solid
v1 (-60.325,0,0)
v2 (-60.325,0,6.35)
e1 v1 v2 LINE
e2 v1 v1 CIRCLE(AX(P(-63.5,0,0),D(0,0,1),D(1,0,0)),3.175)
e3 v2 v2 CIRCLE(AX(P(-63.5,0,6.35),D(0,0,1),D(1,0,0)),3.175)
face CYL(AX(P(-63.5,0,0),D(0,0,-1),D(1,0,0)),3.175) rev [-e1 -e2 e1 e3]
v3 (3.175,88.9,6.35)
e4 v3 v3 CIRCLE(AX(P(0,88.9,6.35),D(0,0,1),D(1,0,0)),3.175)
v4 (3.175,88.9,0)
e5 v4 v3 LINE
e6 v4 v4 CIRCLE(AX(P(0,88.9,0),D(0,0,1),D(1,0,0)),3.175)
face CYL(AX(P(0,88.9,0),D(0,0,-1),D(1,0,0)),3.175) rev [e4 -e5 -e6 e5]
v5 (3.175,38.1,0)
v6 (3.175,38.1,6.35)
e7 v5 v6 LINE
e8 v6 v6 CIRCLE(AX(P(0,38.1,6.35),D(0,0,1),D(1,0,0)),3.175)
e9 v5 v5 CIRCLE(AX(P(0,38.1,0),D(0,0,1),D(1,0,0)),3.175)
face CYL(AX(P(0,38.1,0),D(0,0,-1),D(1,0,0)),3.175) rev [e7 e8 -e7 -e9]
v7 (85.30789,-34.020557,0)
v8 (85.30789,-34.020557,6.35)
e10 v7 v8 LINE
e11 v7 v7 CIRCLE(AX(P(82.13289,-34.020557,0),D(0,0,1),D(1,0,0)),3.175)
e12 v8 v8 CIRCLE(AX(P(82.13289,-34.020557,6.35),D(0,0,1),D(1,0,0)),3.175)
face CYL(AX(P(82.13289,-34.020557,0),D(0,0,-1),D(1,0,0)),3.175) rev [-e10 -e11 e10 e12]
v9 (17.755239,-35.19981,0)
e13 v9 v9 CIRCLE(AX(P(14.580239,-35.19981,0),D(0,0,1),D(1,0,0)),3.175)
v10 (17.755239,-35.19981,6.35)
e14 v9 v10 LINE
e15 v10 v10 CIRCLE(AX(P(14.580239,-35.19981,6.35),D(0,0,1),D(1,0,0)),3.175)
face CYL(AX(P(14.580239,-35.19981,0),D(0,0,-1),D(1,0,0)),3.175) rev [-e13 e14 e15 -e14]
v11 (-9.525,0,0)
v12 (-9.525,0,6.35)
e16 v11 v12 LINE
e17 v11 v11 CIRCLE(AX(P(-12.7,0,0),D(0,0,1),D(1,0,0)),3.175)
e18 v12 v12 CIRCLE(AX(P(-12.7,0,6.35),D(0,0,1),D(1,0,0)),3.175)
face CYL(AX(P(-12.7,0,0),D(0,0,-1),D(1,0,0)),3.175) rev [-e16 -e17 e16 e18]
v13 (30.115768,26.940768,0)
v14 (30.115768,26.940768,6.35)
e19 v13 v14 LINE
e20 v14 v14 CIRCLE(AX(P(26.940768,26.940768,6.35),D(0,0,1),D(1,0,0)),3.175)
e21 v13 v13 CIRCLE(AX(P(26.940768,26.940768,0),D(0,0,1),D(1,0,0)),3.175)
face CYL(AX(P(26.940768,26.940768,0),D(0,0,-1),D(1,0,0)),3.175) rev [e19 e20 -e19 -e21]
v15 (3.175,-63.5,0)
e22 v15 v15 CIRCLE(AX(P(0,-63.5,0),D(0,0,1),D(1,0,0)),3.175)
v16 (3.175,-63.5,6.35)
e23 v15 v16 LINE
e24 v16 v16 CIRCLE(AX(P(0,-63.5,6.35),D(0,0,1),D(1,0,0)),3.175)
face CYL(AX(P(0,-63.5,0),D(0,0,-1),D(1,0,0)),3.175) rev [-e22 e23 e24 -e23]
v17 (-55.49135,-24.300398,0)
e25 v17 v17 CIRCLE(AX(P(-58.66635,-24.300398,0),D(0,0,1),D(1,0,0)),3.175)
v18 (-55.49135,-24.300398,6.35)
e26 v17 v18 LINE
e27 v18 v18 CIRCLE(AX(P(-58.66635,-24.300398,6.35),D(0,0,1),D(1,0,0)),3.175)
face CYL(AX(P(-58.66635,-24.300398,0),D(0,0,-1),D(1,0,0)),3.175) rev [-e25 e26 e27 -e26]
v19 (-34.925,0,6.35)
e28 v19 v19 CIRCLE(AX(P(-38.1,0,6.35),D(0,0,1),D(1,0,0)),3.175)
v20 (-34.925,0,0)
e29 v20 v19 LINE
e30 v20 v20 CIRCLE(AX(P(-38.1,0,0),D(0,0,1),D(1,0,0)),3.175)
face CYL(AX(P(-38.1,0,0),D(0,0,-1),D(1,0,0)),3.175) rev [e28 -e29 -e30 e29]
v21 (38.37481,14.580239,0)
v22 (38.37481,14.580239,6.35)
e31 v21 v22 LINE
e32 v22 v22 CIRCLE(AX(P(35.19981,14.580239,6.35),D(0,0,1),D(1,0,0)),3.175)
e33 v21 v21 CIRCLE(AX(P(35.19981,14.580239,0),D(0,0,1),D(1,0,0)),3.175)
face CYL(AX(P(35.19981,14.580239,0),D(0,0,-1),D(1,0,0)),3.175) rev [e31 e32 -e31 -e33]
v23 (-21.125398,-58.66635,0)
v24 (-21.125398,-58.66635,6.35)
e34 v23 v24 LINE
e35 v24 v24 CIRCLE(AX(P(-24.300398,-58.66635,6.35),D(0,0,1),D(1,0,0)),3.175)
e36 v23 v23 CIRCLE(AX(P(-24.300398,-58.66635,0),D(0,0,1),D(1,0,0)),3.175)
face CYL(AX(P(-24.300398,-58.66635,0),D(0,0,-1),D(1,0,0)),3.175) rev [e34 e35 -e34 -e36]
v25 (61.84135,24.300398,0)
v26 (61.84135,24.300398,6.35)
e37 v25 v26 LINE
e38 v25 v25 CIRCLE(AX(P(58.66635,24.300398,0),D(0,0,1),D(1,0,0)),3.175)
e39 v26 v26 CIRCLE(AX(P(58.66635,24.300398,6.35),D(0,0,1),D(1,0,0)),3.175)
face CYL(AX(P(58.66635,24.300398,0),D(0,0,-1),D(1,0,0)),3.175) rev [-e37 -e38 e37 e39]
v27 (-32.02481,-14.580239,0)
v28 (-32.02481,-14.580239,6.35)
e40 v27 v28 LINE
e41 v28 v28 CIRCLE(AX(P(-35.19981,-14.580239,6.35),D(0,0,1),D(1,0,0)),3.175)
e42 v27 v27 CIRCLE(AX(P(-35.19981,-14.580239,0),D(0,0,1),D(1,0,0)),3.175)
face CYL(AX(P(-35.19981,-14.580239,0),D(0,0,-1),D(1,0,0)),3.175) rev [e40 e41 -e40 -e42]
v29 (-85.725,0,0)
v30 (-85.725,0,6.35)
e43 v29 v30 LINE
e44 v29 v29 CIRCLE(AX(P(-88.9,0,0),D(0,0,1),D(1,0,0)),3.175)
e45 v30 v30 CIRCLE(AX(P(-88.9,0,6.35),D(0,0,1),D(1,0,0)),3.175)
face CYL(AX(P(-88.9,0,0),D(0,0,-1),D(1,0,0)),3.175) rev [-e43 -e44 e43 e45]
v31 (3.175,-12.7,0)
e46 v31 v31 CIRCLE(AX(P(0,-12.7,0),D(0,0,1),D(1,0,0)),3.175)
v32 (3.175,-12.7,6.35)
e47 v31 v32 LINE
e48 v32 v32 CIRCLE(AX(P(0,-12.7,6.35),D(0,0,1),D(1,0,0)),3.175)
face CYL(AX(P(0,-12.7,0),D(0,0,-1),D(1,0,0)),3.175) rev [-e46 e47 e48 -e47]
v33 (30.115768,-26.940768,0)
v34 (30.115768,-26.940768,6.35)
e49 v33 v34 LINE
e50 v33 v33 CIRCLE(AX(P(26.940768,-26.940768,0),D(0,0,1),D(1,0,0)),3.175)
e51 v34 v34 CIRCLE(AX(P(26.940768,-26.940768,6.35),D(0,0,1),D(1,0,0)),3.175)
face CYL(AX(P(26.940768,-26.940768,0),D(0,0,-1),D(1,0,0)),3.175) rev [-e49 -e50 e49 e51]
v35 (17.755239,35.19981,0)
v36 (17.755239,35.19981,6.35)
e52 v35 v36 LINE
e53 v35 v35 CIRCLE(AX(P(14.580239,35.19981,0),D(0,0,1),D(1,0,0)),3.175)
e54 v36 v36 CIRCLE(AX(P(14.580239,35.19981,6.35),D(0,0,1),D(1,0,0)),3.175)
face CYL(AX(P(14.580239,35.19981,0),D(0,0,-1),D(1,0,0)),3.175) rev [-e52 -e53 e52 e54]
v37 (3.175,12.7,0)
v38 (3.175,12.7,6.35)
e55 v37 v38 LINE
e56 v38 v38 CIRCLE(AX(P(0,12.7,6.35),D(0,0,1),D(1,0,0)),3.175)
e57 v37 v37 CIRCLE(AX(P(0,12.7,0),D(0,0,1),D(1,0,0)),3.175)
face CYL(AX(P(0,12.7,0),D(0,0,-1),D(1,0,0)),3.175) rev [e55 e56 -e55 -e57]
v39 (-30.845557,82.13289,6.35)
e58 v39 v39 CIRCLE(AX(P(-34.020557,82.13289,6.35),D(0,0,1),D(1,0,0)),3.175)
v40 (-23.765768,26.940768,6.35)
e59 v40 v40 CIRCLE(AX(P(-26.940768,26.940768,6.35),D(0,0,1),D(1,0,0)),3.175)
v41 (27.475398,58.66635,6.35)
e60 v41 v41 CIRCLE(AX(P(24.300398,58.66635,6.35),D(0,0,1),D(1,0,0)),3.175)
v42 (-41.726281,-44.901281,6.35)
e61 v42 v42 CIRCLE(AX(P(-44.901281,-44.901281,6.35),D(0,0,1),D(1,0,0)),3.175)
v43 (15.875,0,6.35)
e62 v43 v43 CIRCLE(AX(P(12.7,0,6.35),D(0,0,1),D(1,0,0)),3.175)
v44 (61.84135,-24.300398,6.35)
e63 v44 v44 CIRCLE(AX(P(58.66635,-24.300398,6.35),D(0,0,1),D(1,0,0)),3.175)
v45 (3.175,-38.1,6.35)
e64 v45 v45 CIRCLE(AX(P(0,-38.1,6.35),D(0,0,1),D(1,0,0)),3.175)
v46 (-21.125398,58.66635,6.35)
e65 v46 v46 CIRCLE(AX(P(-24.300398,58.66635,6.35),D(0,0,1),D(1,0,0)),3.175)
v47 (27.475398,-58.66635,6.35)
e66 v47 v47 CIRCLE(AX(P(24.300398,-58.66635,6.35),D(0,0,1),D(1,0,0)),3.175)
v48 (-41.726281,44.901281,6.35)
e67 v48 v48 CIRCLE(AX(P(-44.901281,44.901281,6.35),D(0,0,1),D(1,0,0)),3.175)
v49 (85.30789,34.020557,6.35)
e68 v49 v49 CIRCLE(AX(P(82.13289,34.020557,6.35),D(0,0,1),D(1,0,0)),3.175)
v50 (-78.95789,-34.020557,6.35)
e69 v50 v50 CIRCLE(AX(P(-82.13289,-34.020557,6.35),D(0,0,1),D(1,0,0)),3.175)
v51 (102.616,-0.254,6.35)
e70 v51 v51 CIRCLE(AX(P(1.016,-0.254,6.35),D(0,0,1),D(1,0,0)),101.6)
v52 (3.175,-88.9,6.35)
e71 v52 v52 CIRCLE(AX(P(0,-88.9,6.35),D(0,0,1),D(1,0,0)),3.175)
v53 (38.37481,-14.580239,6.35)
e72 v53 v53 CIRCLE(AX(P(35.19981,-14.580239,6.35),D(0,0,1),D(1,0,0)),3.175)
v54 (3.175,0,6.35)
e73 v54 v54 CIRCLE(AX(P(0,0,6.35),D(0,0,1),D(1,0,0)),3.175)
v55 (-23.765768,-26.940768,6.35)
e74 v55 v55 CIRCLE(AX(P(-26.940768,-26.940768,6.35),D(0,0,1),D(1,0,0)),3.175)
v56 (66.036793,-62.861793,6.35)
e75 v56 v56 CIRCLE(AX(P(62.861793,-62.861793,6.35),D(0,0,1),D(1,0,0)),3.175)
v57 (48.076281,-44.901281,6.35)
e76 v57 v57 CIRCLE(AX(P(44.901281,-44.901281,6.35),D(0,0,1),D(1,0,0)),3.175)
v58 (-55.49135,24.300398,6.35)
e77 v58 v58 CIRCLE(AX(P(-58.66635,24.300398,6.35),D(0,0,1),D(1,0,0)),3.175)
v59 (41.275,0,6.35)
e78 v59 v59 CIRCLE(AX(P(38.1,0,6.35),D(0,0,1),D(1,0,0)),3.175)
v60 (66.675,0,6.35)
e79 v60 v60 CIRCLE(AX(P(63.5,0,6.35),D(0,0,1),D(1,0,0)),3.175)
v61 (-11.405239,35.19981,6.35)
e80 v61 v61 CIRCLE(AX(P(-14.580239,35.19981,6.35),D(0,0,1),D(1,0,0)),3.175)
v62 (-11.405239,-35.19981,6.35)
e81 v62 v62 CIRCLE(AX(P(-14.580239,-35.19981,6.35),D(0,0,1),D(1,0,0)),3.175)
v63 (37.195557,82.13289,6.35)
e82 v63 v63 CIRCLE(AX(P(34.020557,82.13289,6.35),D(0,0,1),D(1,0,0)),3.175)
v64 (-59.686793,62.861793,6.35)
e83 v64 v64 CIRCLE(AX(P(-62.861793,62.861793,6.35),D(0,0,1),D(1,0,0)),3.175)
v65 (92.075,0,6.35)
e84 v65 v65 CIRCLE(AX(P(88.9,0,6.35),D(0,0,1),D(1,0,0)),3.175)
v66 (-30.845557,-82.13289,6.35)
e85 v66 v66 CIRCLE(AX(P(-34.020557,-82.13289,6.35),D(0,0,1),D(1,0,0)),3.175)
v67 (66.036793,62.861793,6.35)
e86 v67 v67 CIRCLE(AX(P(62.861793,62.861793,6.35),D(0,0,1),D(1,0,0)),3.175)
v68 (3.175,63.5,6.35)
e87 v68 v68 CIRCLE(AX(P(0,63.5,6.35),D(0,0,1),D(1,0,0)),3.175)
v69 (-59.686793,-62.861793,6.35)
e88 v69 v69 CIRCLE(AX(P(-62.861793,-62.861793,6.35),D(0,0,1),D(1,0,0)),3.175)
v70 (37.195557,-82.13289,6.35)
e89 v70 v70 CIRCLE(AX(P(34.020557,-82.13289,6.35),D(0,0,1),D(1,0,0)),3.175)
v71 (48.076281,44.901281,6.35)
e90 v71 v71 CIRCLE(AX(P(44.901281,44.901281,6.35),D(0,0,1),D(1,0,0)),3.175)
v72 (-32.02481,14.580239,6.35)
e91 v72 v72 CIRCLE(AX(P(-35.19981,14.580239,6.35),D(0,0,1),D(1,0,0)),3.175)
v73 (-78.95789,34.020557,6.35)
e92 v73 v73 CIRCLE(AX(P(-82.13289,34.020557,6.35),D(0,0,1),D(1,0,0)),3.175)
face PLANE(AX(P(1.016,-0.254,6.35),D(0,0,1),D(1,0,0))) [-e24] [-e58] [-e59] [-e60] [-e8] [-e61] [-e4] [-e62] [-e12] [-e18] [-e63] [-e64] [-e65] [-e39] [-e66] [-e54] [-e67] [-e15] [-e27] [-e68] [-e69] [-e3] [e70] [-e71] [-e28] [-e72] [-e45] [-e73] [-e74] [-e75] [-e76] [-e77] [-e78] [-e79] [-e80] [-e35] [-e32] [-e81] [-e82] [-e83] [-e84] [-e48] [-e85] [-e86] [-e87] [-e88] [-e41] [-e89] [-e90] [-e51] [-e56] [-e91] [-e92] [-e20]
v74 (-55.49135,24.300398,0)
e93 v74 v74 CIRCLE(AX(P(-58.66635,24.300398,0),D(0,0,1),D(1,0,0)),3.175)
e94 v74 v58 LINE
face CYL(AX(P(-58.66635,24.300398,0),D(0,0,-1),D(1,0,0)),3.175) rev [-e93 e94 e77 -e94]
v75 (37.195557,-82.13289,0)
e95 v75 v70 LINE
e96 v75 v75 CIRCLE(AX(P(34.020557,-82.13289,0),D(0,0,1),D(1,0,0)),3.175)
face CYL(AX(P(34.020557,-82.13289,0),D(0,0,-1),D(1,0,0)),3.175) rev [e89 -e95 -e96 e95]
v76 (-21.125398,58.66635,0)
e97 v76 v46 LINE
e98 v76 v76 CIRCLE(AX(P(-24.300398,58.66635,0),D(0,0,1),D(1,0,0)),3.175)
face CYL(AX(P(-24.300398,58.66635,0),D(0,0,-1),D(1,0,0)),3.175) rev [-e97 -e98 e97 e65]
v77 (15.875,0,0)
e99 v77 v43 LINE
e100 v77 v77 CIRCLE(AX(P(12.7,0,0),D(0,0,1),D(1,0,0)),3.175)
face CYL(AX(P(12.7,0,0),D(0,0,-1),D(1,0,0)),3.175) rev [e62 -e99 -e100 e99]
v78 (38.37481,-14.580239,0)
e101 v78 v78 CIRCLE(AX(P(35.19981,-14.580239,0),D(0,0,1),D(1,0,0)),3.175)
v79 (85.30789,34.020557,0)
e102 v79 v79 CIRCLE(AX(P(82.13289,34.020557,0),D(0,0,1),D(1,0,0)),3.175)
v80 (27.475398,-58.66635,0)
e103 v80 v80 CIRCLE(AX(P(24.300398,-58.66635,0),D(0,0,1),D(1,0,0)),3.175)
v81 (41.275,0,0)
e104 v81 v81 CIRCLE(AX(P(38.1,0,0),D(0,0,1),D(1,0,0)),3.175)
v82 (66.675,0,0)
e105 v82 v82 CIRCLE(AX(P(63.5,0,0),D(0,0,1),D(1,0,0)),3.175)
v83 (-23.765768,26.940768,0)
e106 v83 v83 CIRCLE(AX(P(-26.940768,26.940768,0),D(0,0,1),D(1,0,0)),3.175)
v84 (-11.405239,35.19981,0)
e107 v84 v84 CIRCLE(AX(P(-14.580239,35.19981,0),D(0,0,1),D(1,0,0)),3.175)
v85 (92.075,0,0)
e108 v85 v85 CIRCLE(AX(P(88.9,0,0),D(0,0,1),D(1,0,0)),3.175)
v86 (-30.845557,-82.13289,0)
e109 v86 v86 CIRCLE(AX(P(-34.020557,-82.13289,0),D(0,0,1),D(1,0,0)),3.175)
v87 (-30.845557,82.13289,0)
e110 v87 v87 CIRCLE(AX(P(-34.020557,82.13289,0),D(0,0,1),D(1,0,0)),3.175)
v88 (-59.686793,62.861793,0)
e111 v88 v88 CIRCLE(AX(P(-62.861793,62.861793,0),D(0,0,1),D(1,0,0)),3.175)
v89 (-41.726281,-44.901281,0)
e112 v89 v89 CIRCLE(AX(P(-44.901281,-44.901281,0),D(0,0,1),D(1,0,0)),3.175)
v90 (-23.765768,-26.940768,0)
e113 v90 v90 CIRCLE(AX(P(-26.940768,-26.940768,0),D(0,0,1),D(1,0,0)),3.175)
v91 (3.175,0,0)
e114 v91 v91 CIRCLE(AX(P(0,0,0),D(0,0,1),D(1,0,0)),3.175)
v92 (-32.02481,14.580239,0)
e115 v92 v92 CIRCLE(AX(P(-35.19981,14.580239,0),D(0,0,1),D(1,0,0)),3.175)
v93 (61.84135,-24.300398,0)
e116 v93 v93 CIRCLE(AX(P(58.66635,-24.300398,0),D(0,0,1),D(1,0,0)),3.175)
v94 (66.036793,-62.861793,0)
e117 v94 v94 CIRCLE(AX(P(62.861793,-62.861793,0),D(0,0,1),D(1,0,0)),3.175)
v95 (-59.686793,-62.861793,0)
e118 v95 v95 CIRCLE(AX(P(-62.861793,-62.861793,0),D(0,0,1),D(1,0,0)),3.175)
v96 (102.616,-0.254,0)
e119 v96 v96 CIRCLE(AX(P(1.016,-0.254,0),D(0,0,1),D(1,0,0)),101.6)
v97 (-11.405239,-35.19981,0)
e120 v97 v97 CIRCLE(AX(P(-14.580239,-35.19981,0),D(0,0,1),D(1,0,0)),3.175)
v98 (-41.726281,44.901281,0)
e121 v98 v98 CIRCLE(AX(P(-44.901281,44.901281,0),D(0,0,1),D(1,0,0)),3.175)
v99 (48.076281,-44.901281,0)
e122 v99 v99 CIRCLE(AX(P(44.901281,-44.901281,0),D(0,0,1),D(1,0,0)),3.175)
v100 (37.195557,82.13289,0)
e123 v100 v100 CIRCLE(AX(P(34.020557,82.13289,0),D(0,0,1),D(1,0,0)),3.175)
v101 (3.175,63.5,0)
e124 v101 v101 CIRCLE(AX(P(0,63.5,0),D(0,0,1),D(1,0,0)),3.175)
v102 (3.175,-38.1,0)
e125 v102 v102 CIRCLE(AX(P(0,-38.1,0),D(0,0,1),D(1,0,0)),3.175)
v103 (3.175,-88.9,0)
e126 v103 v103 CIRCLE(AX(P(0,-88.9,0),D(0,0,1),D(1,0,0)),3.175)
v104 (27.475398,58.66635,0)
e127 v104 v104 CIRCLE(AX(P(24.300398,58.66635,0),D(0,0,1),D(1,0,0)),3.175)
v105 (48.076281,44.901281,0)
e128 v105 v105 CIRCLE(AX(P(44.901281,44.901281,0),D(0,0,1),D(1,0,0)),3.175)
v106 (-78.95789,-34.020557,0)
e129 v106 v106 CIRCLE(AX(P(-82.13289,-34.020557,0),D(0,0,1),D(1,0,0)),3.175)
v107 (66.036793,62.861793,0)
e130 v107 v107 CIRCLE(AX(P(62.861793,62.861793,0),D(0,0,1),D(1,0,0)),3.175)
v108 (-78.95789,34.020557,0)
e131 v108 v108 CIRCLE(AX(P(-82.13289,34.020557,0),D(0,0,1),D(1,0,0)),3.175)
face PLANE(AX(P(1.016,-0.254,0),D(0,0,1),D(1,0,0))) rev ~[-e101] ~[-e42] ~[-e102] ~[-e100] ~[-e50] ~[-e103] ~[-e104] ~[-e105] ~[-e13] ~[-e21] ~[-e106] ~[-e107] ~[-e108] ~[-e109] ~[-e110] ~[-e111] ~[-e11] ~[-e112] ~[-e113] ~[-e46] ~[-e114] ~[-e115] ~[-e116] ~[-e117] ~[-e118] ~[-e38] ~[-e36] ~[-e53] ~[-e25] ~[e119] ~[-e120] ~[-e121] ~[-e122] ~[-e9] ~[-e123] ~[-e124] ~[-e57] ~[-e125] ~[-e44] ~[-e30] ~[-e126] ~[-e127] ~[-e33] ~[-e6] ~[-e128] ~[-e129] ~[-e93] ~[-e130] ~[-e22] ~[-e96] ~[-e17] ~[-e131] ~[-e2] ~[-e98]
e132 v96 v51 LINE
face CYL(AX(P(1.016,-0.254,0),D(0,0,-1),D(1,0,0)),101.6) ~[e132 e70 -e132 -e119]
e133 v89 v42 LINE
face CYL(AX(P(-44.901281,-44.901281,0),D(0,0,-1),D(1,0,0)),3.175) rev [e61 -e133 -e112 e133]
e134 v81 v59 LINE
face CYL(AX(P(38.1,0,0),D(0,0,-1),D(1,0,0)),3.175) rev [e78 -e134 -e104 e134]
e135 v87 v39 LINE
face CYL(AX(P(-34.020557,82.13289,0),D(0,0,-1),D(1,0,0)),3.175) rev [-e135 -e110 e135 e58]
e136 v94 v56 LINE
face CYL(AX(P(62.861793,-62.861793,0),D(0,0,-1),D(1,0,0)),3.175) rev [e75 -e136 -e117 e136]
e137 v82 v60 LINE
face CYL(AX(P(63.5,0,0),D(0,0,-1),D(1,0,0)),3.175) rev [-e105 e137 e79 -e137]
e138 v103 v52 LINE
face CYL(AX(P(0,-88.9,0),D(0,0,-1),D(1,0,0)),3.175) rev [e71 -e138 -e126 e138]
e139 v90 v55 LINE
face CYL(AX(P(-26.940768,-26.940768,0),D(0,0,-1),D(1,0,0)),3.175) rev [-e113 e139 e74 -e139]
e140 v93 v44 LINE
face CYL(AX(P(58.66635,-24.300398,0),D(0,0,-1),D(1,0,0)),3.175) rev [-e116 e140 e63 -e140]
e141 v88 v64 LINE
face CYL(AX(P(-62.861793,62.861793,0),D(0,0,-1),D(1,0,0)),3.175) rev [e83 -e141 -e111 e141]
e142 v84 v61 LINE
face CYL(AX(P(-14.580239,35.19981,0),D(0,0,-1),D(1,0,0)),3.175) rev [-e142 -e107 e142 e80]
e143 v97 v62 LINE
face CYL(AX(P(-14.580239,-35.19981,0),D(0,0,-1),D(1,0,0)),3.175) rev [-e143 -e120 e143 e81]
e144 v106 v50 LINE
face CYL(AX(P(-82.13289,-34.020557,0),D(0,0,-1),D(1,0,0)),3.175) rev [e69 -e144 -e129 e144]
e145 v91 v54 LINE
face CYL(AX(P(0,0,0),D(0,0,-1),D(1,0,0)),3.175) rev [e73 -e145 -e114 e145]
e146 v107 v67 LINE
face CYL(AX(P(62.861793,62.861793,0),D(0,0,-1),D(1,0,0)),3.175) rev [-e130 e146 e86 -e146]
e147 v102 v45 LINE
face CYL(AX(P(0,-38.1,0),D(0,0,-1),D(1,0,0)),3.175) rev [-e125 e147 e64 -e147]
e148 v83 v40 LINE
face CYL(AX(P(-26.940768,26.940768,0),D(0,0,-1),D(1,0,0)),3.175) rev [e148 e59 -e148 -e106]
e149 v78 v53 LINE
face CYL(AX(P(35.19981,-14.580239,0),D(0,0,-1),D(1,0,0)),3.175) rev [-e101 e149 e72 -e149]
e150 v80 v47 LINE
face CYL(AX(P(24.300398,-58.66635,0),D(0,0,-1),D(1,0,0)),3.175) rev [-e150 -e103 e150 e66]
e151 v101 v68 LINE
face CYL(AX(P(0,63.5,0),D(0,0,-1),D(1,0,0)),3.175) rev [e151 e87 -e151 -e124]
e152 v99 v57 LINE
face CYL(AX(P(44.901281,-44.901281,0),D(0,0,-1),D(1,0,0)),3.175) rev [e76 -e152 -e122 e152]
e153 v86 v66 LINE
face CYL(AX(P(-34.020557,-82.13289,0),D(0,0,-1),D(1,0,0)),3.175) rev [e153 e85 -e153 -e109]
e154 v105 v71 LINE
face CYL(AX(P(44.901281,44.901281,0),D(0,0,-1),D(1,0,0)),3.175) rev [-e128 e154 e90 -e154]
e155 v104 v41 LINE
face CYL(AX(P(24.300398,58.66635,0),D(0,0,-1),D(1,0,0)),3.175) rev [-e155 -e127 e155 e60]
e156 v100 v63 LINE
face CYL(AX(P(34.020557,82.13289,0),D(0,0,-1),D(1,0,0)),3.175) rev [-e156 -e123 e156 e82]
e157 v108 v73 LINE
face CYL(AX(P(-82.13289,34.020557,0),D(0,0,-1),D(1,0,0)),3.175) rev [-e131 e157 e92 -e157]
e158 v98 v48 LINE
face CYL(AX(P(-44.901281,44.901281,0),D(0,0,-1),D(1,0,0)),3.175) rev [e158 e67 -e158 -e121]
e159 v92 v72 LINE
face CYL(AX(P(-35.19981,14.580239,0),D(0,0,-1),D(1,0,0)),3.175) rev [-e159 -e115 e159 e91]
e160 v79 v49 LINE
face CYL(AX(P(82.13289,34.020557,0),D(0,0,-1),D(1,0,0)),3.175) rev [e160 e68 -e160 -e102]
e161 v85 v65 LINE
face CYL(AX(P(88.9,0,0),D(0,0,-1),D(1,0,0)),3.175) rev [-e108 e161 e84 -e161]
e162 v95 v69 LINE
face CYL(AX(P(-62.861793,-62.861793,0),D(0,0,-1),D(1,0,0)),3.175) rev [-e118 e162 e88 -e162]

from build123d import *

# Parameters (mm, degrees)
F0_R     = 101.6
F0_R_2   = 3.175
F1_DEPTH = 6.35


# Not quite as in the source:
# - the program builds the solid bodies; features that only make, move or delete a surface that nothing else refers to are left out


with BuildPart() as f1:
    # F0 (on Top) → F1 (new body)
    with BuildSketch(Plane.XY):
        with Locations((1.0160004022, -0.2540000132)):
            Circle(F0_R)
        with Locations((-62.8617928475, -62.8617928475)):
            Circle(F0_R_2, mode=Mode.SUBTRACT)
        with Locations((-34.0205571373, -82.1328904403)):
            Circle(F0_R_2, mode=Mode.SUBTRACT)
        with Locations((0, -88.9)):
            Circle(F0_R_2, mode=Mode.SUBTRACT)
        with Locations((-24.3003979552, -58.6663503145)):
            Circle(F0_R_2, mode=Mode.SUBTRACT)
        with Locations((0, -63.5)):
            Circle(F0_R_2, mode=Mode.SUBTRACT)
        with Locations((-82.1328904403, -34.0205571373)):
            Circle(F0_R_2, mode=Mode.SUBTRACT)
        with Locations((-58.6663503145, -24.3003979552)):
            Circle(F0_R_2, mode=Mode.SUBTRACT)
        with Locations((-44.9012806053, -44.9012806053)):
            Circle(F0_R_2, mode=Mode.SUBTRACT)
        with Locations((-26.9407683632, -26.9407683632)):
            Circle(F0_R_2, mode=Mode.SUBTRACT)
        with Locations((-14.5802387731, -35.1998101887)):
            Circle(F0_R_2, mode=Mode.SUBTRACT)
        with Locations((0, -38.1)):
            Circle(F0_R_2, mode=Mode.SUBTRACT)
        with Locations((-35.1998101887, -14.5802387731)):
            Circle(F0_R_2, mode=Mode.SUBTRACT)
        with Locations((0, -12.7)):
            Circle(F0_R_2, mode=Mode.SUBTRACT)
        with Locations((34.0205571373, -82.1328904403)):
            Circle(F0_R_2, mode=Mode.SUBTRACT)
        with Locations((24.3003979552, -58.6663503145)):
            Circle(F0_R_2, mode=Mode.SUBTRACT)
        with Locations((62.8617928475, -62.8617928475)):
            Circle(F0_R_2, mode=Mode.SUBTRACT)
        with Locations((14.5802387731, -35.1998101887)):
            Circle(F0_R_2, mode=Mode.SUBTRACT)
        with Locations((44.9012806053, -44.9012806053)):
            Circle(F0_R_2, mode=Mode.SUBTRACT)
        with Locations((26.9407683632, -26.9407683632)):
            Circle(F0_R_2, mode=Mode.SUBTRACT)
        with Locations((35.1998101887, -14.5802387731)):
            Circle(F0_R_2, mode=Mode.SUBTRACT)
        with Locations((82.1328904403, -34.0205571373)):
            Circle(F0_R_2, mode=Mode.SUBTRACT)
        with Locations((58.6663503145, -24.3003979552)):
            Circle(F0_R_2, mode=Mode.SUBTRACT)
        with Locations((-88.9, 0)):
            Circle(F0_R_2, mode=Mode.SUBTRACT)
        with Locations((-63.5, 0)):
            Circle(F0_R_2, mode=Mode.SUBTRACT)
        with Locations((-58.6663503145, 24.3003979552)):
            Circle(F0_R_2, mode=Mode.SUBTRACT)
        with Locations((-82.1328904403, 34.0205571373)):
            Circle(F0_R_2, mode=Mode.SUBTRACT)
        with Locations((-38.1, 0)):
            Circle(F0_R_2, mode=Mode.SUBTRACT)
        with Locations((-35.1998101887, 14.5802387731)):
            Circle(F0_R_2, mode=Mode.SUBTRACT)
        with Locations((-12.7, 0)):
            Circle(F0_R_2, mode=Mode.SUBTRACT)
        Circle(F0_R_2, mode=Mode.SUBTRACT)
        with Locations((0, 12.7)):
            Circle(F0_R_2, mode=Mode.SUBTRACT)
        with Locations((-26.9407683632, 26.9407683632)):
            Circle(F0_R_2, mode=Mode.SUBTRACT)
        with Locations((-44.9012806053, 44.9012806053)):
            Circle(F0_R_2, mode=Mode.SUBTRACT)
        with Locations((-14.5802387731, 35.1998101887)):
            Circle(F0_R_2, mode=Mode.SUBTRACT)
        with Locations((0, 38.1)):
            Circle(F0_R_2, mode=Mode.SUBTRACT)
        with Locations((-62.8617928475, 62.8617928475)):
            Circle(F0_R_2, mode=Mode.SUBTRACT)
        with Locations((-24.3003979552, 58.6663503145)):
            Circle(F0_R_2, mode=Mode.SUBTRACT)
        with Locations((0, 63.5)):
            Circle(F0_R_2, mode=Mode.SUBTRACT)
        with Locations((-34.0205571373, 82.1328904403)):
            Circle(F0_R_2, mode=Mode.SUBTRACT)
        with Locations((0, 88.9)):
            Circle(F0_R_2, mode=Mode.SUBTRACT)
        with Locations((12.7, 0)):
            Circle(F0_R_2, mode=Mode.SUBTRACT)
        with Locations((38.1, 0)):
            Circle(F0_R_2, mode=Mode.SUBTRACT)
        with Locations((35.1998101887, 14.5802387731)):
            Circle(F0_R_2, mode=Mode.SUBTRACT)
        with Locations((14.5802387731, 35.1998101887)):
            Circle(F0_R_2, mode=Mode.SUBTRACT)
        with Locations((26.9407683632, 26.9407683632)):
            Circle(F0_R_2, mode=Mode.SUBTRACT)
        with Locations((44.9012806053, 44.9012806053)):
            Circle(F0_R_2, mode=Mode.SUBTRACT)
        with Locations((63.5, 0)):
            Circle(F0_R_2, mode=Mode.SUBTRACT)
        with Locations((58.6663503145, 24.3003979552)):
            Circle(F0_R_2, mode=Mode.SUBTRACT)
        with Locations((88.9, 0)):
            Circle(F0_R_2, mode=Mode.SUBTRACT)
        with Locations((82.1328904403, 34.0205571373)):
            Circle(F0_R_2, mode=Mode.SUBTRACT)
        with Locations((24.3003979552, 58.6663503145)):
            Circle(F0_R_2, mode=Mode.SUBTRACT)
        with Locations((34.0205571373, 82.1328904403)):
            Circle(F0_R_2, mode=Mode.SUBTRACT)
        with Locations((62.8617928475, 62.8617928475)):
            Circle(F0_R_2, mode=Mode.SUBTRACT)
    extrude(amount=F1_DEPTH)


solid = f1.part
